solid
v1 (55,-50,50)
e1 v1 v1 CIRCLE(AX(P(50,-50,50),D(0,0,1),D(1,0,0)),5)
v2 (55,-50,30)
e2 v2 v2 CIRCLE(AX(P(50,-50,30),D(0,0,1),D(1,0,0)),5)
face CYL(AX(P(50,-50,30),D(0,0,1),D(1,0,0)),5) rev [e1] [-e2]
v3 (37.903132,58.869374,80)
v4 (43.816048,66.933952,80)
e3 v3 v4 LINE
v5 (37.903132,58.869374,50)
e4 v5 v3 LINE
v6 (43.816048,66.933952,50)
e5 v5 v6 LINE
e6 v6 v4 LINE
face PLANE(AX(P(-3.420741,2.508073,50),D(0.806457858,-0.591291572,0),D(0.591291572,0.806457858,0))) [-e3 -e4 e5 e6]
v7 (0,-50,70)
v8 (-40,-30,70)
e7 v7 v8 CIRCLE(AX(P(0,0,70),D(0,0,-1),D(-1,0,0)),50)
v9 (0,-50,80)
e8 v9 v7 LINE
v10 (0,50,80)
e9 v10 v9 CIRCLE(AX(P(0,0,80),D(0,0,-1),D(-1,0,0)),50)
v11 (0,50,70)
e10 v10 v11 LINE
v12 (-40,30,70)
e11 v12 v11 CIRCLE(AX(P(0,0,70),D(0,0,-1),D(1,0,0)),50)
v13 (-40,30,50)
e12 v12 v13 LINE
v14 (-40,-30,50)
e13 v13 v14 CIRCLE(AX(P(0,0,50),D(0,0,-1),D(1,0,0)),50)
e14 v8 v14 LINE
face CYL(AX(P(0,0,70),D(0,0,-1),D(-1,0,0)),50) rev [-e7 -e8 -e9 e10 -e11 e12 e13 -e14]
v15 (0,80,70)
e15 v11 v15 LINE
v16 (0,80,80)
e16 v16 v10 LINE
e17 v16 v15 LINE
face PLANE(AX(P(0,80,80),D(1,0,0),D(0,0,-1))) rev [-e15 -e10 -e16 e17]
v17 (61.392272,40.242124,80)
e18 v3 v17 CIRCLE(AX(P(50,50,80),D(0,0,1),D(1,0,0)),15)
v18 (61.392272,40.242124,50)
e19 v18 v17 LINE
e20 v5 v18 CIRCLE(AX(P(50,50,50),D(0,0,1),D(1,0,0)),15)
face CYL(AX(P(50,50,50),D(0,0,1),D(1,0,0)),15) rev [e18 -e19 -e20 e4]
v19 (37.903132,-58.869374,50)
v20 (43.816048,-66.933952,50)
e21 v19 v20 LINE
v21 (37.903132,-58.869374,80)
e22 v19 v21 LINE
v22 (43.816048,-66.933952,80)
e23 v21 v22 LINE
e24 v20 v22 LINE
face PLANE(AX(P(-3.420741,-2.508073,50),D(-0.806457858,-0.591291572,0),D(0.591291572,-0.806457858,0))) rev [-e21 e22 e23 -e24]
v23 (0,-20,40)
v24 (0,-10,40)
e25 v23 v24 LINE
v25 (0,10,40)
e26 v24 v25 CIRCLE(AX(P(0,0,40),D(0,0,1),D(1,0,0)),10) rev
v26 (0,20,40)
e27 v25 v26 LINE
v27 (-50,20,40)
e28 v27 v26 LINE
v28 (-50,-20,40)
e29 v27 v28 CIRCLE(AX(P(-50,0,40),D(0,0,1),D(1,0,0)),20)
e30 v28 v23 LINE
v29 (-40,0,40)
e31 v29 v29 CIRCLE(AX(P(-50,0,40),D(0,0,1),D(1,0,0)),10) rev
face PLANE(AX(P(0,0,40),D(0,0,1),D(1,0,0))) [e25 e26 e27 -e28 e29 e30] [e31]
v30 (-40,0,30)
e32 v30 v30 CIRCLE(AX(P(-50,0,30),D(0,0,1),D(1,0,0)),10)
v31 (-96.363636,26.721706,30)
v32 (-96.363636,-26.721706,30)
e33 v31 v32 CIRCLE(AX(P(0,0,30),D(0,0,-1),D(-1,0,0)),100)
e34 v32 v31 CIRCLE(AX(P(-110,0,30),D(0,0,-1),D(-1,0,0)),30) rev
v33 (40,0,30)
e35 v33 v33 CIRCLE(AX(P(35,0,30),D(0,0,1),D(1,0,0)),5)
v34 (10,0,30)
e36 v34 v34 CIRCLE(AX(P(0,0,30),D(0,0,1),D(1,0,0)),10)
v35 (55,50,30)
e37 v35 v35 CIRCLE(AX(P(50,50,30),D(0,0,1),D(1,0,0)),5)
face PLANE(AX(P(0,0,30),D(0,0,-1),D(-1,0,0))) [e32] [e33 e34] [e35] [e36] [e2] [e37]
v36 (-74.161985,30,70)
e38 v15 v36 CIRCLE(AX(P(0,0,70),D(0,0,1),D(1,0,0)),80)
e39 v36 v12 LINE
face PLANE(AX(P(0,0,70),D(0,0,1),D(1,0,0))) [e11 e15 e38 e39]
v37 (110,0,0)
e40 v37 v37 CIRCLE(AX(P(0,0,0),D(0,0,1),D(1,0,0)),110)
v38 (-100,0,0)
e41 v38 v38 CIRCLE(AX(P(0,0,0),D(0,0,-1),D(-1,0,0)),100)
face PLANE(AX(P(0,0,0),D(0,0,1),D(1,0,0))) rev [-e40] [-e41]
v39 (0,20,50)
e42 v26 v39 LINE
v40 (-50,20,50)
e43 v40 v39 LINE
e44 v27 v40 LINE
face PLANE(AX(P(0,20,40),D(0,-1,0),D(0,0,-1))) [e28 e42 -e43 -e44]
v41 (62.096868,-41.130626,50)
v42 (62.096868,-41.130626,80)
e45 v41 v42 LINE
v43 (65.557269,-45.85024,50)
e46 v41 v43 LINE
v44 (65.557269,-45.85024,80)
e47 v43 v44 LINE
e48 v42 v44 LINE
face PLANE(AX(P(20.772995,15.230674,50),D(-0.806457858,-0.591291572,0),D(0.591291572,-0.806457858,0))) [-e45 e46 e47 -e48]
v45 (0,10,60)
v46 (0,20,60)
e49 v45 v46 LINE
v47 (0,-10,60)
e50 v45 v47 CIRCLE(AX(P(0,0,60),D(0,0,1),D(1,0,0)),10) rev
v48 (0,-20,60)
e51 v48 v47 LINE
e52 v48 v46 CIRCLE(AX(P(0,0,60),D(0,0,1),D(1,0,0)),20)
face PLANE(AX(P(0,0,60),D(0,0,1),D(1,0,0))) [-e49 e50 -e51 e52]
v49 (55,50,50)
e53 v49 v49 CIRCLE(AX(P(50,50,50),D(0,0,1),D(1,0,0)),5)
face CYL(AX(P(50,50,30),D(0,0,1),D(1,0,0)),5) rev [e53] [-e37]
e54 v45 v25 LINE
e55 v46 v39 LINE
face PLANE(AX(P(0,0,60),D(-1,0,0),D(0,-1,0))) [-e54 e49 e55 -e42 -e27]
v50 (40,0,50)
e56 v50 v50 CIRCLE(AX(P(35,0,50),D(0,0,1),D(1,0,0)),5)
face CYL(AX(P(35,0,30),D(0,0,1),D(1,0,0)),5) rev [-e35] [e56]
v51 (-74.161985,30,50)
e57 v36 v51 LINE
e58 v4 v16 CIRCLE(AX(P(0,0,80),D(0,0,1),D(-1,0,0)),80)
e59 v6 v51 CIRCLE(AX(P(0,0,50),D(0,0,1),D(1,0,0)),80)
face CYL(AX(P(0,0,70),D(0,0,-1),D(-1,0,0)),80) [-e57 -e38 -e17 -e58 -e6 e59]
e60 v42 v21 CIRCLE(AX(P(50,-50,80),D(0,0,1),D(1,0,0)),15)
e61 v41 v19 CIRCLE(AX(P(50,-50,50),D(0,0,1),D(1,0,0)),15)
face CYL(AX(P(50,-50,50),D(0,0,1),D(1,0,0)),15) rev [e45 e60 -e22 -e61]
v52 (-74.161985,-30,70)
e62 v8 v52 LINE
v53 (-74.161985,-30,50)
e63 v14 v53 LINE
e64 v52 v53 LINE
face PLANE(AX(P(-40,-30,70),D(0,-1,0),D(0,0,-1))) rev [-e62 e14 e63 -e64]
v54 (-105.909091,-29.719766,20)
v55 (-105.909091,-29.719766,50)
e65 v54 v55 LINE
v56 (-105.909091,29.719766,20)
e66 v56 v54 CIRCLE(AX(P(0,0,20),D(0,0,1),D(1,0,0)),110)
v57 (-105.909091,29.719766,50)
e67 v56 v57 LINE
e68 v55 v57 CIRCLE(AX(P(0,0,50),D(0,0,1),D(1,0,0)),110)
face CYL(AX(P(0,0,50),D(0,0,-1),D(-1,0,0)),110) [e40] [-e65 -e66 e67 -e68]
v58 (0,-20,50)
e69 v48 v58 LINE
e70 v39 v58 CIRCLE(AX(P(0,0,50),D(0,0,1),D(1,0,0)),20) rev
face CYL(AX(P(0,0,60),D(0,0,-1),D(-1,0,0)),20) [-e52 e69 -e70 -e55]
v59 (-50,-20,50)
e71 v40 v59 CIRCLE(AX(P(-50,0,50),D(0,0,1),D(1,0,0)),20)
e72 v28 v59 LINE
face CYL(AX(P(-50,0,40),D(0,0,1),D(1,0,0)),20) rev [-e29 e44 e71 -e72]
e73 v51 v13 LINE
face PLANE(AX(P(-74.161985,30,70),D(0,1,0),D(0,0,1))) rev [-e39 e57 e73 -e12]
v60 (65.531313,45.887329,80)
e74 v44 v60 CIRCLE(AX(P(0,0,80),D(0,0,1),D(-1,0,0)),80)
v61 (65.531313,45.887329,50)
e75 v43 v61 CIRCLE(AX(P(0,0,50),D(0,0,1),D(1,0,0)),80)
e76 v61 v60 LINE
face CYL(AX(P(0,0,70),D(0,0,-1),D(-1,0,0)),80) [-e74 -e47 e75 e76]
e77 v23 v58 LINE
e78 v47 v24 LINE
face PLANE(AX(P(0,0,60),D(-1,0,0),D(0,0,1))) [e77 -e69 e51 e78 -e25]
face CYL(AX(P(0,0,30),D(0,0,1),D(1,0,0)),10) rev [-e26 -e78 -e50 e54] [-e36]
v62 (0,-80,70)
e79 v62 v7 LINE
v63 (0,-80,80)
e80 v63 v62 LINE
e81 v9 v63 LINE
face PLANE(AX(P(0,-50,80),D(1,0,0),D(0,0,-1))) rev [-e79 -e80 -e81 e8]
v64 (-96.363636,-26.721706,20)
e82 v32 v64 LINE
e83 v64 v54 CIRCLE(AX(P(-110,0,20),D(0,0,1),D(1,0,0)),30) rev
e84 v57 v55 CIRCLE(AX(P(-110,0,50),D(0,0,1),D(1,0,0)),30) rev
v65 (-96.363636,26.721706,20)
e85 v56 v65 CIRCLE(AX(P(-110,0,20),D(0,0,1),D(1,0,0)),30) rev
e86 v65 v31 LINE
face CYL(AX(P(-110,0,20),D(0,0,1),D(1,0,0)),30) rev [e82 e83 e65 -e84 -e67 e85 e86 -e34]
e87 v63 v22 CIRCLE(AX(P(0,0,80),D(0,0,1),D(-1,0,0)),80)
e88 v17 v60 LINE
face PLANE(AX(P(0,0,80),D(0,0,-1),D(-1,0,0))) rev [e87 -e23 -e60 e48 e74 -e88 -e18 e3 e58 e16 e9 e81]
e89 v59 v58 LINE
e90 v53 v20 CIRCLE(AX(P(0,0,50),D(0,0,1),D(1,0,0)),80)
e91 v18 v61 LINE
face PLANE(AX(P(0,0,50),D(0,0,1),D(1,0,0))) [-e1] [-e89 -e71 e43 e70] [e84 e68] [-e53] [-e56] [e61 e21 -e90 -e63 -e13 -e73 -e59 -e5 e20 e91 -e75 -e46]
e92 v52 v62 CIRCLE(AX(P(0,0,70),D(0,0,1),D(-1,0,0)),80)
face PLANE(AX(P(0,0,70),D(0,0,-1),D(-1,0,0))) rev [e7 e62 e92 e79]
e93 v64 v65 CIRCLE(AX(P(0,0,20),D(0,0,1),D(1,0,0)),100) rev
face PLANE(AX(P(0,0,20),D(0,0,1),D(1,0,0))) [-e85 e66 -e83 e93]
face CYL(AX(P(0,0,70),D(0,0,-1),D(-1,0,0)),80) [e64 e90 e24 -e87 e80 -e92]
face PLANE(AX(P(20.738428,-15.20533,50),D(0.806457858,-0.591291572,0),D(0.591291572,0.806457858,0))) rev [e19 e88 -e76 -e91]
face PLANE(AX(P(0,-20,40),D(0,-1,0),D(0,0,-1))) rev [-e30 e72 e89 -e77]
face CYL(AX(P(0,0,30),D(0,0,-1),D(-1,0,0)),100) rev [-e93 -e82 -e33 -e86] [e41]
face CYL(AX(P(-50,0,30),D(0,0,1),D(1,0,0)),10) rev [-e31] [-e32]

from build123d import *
from build123d.topology import SkipClean

# Parameters (mm, degrees)
SKETCH1_R           = 110
BOSS_EXTRUDE2_DEPTH = 50
SKETCH3_R           = 100
CUT_EXTRUDE1_DEPTH  = 30
SKETCH4_R           = 10
SKETCH4_R_2         = 5
CUT_EXTRUDE2_DEPTH  = 20
SKETCH5_R           = 10
CUT_EXTRUDE3_DEPTH  = 10
BOSS_EXTRUDE3_START = 20
BOSS_EXTRUDE3_DEPTH = 20
CUT_EXTRUDE6_START  = -30
CUT_EXTRUDE6_DEPTH  = 30
BOSS_EXTRUDE4_DEPTH = 20
BOSS_EXTRUDE5_DEPTH = 20
BOSS_EXTRUDE6_DEPTH = 30
CUT_EXTRUDE8_START  = -30
SKETCH11_R          = 5
CUT_EXTRUDE8_DEPTH  = 30
CUT_EXTRUDE9_START  = -50
SKETCH12_R          = 5
CUT_EXTRUDE9_DEPTH  = 50
CUT_EXTRUDE10_START = -50
SKETCH13_R          = 5
CUT_EXTRUDE10_DEPTH = 50


with BuildPart() as part:
    # Sketch1 → Boss-Extrude2 (new body)
    with BuildSketch(Plane.XY):
        Circle(SKETCH1_R)
    extrude(amount=BOSS_EXTRUDE2_DEPTH)

    # Sketch3 → Cut-Extrude1 (cut)
    with BuildSketch(Plane(origin=(0, 0, 0), x_dir=(-1, 0, 0), z_dir=(0, 0, -1))):
        Circle(SKETCH3_R)
    extrude(amount=-CUT_EXTRUDE1_DEPTH, mode=Mode.SUBTRACT)

    # Sketch4 → Cut-Extrude2 (cut)
    with BuildSketch(Plane.XY.offset(50)):
        Circle(SKETCH4_R)
        with Locations((-50, 0)):
            Circle(SKETCH4_R)
        with Locations((35, 0)):
            Circle(SKETCH4_R_2)
    extrude(amount=-CUT_EXTRUDE2_DEPTH, mode=Mode.SUBTRACT)

    # Sketch5 → Cut-Extrude3 (cut)
    with BuildSketch(Plane.XY.offset(50)):
        with BuildLine():
            Line((0, 20), (-50, 20))
            ThreePointArc((-50, 20), (-70, 0), (-50, -20))
            Line((-50, -20), (0, -20))
            ThreePointArc((0, -20), (20, 0), (0, 20))
        make_face()
        with Locations((-50, 0)):
            Circle(SKETCH5_R, mode=Mode.SUBTRACT)
        with BuildLine():
            ThreePointArc((10, 0), (-7.071067812, -7.071067812), (0, 10))
            ThreePointArc((0, 10), (7.071067812, 7.071067812), (10, 0))
        make_face(mode=Mode.SUBTRACT)
    extrude(amount=-CUT_EXTRUDE3_DEPTH, mode=Mode.SUBTRACT)

    # Sketch6 → Boss-Extrude3 (add)
    with BuildSketch(Plane.XY.offset(40).offset(BOSS_EXTRUDE3_START)):
        with BuildLine():
            Line((0, -10), (0, -20))
            ThreePointArc((0, -20), (20, 0), (0, 20))
            Line((0, 20), (0, 10))
            ThreePointArc((0, 10), (7.071067812, 7.071067812), (10, 0))
            ThreePointArc((10, 0), (7.071067812, -7.071067812), (0, -10))
        make_face()
    extrude(amount=-BOSS_EXTRUDE3_DEPTH)

    # Sketch7 → Cut-Extrude6 (cut)
    with BuildSketch(Plane.XY.offset(50).offset(CUT_EXTRUDE6_START)):
        with BuildLine():
            ThreePointArc((-105.909090909, -29.719765524), (-80, 0), (-105.909090909, 29.719765524))
            ThreePointArc((-105.909090909, 29.719765524), (-110, 0), (-105.909090909, -29.719765524))
        make_face()
    extrude(amount=CUT_EXTRUDE6_DEPTH, mode=Mode.SUBTRACT)

    # Sketch8 → Boss-Extrude4 (add)
    with BuildSketch(Plane.XY.offset(50)):
        with BuildLine():
            Line((0, 50), (0, 80))
            ThreePointArc((0, 80), (-44.72135955, 66.332495807), (-74.161984871, 30))
            Line((-74.161984871, 30), (-40, 30))
            ThreePointArc((-40, 30), (-22.360679775, 44.72135955), (0, 50))
        make_face()
    extrude(amount=BOSS_EXTRUDE4_DEPTH)

    # Sketch9 → Boss-Extrude5 (add)
    with BuildSketch(Plane.XY.offset(50)):
        with BuildLine():
            Line((0, -50), (0, -80))
            ThreePointArc((0, -80), (-44.72135955, -66.332495807), (-74.161984871, -30))
            Line((-74.161984871, -30), (-40, -30))
            ThreePointArc((-40, -30), (-22.360679775, -44.72135955), (0, -50))
        make_face()
    extrude(amount=BOSS_EXTRUDE5_DEPTH)

    # Sketch10 → Boss-Extrude6 (add)
    with SkipClean():  # the faces are left unmerged after this step: merging them gives an invalid solid
        with BuildSketch(Plane.XY.offset(50)):
            with BuildLine():
                Line((0, 80), (0, 50))
                ThreePointArc((0, 50), (50, 0), (0, -50))
                Line((0, -50), (0, -80))
                ThreePointArc((0, -80), (80, 0), (0, 80))
            make_face()
        extrude(amount=BOSS_EXTRUDE6_DEPTH)
    add(part.part.scale(1), mode=Mode.REPLACE)  # the faces are merged on a copy

    # Sketch11 → Cut-Extrude8 (cut)
    # profile 1 of 2: a face of its own
    with BuildSketch(Plane.XY.offset(80).offset(CUT_EXTRUDE8_START)):
        with BuildLine():
            ThreePointArc((43.816047842, -66.933952158), (55.693458652, -57.430293951), (65.557268925, -45.850239816))
            Line((65.557268925, -45.850239816), (62.096867875, -41.130626425))
            ThreePointArc((62.096867875, -41.130626425), (41.130626425, -37.903132125), (37.903132125, -58.869373575))
            Line((37.903132125, -58.869373575), (43.816047842, -66.933952158))
        make_face()
        with Locations((50, -50)):
            Circle(SKETCH11_R, mode=Mode.SUBTRACT)
    # profile 2 of 2: a face of its own
    with BuildSketch(Plane.XY.offset(80).offset(CUT_EXTRUDE8_START)):
        with BuildLine():
            Line((43.816047842, 66.933952158), (37.903132125, 58.869373575))
            ThreePointArc((37.903132125, 58.869373575), (40.679714776, 38.247030872), (61.392272116, 40.242124409))
            Line((61.392272116, 40.242124409), (65.531313117, 45.887329418))
            ThreePointArc((65.531313117, 45.887329418), (55.67720736, 57.446049304), (43.816047842, 66.933952158))
        make_face()
        with Locations((50, 50)):
            Circle(SKETCH11_R, mode=Mode.SUBTRACT)
    extrude(amount=CUT_EXTRUDE8_DEPTH, mode=Mode.SUBTRACT)

    # Sketch12 → Cut-Extrude9 (cut)
    with SkipClean():  # the faces are left unmerged after this step: merging them gives an invalid solid
        with BuildSketch(Plane.XY.offset(80).offset(CUT_EXTRUDE9_START)):
            with Locations((50, 50)):
                Circle(SKETCH12_R)
        extrude(amount=CUT_EXTRUDE9_DEPTH, mode=Mode.SUBTRACT)

    # Sketch13 → Cut-Extrude10 (cut)
    with SkipClean():  # the faces are left unmerged after this step: merging them gives an invalid solid
        with BuildSketch(Plane.XY.offset(80).offset(CUT_EXTRUDE10_START)):
            with Locations((50, -50)):
                Circle(SKETCH13_R)
        extrude(amount=CUT_EXTRUDE10_DEPTH, mode=Mode.SUBTRACT)


solid = part.part
